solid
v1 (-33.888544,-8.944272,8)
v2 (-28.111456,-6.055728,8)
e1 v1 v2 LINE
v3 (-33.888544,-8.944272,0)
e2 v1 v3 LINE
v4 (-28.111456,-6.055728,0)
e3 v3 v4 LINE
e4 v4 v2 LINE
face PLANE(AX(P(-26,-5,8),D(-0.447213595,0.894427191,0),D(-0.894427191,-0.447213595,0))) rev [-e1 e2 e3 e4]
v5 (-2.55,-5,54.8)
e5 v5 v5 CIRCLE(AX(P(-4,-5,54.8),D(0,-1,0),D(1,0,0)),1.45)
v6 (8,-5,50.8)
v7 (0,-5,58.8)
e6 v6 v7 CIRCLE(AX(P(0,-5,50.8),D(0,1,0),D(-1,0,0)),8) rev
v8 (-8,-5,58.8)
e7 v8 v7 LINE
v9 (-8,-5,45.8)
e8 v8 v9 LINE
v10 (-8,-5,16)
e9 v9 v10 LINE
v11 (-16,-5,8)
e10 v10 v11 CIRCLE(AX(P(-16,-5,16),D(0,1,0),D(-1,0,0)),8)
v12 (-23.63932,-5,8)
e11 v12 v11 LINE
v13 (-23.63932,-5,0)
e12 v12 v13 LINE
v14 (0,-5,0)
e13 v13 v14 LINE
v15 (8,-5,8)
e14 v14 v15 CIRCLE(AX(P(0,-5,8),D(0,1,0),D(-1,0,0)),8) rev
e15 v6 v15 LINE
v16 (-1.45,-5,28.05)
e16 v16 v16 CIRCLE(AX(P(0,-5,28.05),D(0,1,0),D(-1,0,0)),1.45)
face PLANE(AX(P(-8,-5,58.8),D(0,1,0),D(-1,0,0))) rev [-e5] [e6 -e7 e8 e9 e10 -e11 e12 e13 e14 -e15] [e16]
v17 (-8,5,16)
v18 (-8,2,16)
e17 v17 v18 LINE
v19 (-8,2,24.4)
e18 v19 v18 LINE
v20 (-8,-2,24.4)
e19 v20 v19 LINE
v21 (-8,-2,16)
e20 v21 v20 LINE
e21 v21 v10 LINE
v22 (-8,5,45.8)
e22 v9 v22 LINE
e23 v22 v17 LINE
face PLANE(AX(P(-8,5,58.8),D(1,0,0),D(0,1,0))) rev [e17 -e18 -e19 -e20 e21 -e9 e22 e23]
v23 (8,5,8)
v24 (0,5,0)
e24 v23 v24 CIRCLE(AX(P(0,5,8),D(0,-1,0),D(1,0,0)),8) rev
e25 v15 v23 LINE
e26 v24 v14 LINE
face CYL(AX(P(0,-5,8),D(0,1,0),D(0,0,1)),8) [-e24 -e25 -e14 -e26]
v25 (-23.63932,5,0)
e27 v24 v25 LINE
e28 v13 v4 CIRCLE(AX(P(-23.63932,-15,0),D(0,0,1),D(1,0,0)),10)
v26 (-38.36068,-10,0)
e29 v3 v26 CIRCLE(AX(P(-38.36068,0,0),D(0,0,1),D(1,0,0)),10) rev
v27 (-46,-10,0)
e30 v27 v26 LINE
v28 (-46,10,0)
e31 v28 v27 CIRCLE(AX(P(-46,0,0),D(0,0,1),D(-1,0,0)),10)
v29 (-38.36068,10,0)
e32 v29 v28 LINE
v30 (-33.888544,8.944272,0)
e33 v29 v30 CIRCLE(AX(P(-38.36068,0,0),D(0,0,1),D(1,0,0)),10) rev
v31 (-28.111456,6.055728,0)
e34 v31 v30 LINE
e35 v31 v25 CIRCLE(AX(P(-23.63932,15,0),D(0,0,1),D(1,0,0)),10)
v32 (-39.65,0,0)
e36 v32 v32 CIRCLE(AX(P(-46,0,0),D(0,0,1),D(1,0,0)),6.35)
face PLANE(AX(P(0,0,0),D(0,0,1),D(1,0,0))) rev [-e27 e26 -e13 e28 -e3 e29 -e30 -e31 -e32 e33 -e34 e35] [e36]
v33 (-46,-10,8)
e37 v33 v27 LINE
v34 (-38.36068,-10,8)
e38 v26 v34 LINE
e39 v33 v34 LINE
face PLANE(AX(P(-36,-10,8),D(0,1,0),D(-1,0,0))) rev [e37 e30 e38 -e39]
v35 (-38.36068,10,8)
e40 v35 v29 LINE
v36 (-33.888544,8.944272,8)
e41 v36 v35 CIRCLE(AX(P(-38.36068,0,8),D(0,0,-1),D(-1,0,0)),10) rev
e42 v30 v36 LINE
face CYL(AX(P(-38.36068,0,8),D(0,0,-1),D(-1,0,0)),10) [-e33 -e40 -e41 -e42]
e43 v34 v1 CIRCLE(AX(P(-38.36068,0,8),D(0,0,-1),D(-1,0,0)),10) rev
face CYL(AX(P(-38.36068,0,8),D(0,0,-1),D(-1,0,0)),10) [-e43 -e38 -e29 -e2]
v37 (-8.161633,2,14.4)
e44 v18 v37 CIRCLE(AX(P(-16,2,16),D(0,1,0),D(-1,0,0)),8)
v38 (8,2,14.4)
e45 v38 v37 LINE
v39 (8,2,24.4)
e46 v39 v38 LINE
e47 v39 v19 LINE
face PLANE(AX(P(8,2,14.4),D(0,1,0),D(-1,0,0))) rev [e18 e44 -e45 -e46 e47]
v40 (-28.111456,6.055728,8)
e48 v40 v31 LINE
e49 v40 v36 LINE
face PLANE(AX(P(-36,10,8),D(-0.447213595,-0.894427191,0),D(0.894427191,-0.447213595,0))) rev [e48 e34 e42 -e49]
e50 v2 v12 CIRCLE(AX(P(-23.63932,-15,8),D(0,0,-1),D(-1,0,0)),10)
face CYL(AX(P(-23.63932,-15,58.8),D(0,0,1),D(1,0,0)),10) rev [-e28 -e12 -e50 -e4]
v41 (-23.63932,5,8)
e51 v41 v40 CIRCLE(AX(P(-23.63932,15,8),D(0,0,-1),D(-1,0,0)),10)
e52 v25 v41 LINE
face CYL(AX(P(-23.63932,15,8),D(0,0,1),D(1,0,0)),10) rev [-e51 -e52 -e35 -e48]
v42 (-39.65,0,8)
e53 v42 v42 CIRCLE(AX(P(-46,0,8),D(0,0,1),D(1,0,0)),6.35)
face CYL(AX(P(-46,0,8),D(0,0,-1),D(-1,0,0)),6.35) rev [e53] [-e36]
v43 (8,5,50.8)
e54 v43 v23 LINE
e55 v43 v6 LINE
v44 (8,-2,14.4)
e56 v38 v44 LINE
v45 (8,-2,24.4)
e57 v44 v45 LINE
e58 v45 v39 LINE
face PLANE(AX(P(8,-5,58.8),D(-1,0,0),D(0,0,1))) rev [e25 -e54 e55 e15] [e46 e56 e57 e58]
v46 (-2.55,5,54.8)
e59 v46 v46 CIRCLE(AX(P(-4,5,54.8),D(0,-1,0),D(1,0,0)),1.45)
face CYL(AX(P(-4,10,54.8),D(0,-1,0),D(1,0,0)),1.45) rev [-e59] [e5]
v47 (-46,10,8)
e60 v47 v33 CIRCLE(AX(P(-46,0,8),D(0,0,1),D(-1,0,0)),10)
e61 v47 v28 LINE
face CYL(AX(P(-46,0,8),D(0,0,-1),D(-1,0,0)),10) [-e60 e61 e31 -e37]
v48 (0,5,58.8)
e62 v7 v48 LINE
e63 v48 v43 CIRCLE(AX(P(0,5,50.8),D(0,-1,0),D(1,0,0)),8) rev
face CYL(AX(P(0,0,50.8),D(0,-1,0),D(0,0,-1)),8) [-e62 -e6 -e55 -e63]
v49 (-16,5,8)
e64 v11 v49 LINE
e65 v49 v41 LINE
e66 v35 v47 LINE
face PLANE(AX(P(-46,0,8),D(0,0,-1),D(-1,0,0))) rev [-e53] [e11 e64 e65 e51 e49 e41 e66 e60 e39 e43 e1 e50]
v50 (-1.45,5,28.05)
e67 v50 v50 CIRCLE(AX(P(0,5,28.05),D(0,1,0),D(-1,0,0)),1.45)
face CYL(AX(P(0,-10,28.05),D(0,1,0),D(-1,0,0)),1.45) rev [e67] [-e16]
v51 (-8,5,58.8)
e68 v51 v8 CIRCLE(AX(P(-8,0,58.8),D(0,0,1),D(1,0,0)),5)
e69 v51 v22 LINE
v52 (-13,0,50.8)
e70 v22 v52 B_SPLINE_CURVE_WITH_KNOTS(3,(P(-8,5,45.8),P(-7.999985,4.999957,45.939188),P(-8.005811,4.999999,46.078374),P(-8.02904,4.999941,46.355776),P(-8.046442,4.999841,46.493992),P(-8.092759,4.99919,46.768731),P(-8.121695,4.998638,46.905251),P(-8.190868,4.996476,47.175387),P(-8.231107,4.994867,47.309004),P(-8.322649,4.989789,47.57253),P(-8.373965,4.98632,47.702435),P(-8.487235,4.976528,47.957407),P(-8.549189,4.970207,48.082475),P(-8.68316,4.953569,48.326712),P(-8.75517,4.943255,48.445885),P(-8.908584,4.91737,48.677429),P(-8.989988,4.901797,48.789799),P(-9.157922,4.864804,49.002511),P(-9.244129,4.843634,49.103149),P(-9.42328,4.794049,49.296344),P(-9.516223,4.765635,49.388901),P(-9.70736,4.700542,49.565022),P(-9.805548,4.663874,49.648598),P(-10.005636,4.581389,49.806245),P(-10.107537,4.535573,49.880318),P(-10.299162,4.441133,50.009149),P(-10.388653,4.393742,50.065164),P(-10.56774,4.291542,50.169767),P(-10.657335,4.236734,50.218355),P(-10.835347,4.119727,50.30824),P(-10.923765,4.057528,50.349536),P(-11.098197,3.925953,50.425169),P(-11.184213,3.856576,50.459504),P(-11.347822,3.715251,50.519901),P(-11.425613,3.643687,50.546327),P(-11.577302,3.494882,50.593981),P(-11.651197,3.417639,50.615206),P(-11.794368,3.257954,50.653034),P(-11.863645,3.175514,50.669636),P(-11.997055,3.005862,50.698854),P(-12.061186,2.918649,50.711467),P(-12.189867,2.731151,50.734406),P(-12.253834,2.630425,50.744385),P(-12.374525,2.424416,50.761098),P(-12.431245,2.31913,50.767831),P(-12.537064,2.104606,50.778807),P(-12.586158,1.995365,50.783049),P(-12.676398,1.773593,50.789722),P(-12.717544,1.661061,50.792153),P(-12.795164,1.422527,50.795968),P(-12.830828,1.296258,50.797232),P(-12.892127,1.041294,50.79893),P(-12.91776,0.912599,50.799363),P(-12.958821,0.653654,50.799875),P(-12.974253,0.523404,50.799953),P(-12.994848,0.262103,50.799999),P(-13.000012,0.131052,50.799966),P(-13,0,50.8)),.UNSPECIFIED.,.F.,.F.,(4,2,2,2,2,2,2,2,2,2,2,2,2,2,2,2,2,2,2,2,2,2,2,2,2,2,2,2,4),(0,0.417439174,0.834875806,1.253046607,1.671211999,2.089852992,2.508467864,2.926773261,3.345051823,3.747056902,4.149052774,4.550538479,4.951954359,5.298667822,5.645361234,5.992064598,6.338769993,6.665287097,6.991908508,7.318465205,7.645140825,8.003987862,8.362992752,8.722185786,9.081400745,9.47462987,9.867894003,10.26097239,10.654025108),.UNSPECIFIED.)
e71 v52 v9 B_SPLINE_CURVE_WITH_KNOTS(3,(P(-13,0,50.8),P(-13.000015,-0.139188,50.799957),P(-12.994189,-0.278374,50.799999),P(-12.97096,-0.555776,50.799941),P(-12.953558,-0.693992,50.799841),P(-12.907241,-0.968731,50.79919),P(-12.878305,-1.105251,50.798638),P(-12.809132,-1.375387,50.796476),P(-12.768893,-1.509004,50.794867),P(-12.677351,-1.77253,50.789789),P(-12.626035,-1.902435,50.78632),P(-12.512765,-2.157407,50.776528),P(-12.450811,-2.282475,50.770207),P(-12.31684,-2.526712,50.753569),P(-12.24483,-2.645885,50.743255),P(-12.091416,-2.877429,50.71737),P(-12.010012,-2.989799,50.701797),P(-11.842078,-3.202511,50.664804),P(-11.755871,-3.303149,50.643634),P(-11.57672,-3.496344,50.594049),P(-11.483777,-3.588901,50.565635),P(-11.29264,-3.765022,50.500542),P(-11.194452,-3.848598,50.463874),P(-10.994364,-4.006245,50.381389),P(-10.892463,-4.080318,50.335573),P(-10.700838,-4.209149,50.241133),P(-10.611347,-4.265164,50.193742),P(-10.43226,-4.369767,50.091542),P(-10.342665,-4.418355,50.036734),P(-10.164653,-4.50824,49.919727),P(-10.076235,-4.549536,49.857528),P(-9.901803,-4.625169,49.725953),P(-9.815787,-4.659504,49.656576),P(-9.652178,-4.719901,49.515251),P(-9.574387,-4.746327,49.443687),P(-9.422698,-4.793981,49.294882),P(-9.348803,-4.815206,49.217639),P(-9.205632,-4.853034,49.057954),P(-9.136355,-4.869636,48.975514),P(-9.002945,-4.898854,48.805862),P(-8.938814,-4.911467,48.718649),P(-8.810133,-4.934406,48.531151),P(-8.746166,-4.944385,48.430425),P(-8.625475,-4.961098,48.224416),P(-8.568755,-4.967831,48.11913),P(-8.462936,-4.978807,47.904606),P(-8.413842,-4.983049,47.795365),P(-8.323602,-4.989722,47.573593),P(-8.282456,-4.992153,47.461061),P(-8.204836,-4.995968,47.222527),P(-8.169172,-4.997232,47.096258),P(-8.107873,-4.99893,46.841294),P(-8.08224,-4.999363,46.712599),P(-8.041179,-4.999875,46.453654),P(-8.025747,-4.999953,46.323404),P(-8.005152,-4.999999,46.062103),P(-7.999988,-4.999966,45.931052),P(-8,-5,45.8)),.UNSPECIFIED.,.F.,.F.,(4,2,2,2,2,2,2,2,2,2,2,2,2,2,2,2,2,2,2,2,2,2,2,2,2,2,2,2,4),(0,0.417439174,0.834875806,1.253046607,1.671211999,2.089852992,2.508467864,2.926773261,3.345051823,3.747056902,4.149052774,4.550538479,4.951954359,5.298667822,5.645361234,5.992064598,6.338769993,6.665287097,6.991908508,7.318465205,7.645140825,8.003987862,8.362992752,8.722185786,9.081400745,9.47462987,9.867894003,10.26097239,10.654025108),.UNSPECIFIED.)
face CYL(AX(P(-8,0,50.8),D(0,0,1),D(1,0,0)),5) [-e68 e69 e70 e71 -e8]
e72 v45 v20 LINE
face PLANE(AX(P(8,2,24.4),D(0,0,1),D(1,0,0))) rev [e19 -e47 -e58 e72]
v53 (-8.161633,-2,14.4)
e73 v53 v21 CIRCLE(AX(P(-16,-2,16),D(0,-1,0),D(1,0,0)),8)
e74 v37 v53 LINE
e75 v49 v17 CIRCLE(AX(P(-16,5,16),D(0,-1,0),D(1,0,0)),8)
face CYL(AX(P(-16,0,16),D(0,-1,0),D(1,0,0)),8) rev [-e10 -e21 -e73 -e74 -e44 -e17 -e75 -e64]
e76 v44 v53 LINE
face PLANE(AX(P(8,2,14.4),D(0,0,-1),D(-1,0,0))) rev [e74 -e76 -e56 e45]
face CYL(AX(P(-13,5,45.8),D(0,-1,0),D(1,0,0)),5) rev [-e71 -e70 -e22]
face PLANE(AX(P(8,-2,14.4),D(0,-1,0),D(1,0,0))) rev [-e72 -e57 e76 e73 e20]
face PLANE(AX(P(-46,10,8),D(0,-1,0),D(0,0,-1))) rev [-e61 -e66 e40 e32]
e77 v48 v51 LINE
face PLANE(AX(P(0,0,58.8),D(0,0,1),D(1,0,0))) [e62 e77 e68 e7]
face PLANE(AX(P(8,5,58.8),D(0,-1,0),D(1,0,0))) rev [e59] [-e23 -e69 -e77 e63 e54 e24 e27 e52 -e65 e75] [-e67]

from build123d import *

# Parameters (mm, degrees)
SKETCH1_W           = 16
SKETCH1_H           = 10
BOSS_EXTRUDE1_DEPTH = 58.8
BOSS_EXTRUDE2_DEPTH = 8
SKETCH4_R           = 6.35
BOSS_EXTRUDE4_DEPTH = 8
SKETCH7_R           = 1.45
CUT_EXTRUDE1_DEPTH  = 83.573845738
SKETCH13_R          = 1.45
CUT_EXTRUDE5_DEPTH  = 83.573845738
SKETCH14_W          = 10
SKETCH14_H          = 4
CUT_EXTRUDE6_DEPTH  = 77.560041797
FILLET1_R           = 8
FILLET4_R           = 10
FILLET5_R           = 5
FILLET6_R           = 8


with BuildPart() as part:
    # Sketch1 → Boss-Extrude1 (new body)
    with BuildSketch(Plane.XY):
        Rectangle(SKETCH1_W, SKETCH1_H)
    extrude(amount=BOSS_EXTRUDE1_DEPTH)

    # Sketch2 → Boss-Extrude2 (add)
    with BuildSketch(Plane.XY.offset(58.8)):
        with BuildLine():
            Line((-8, 5), (-8, -5))
            ThreePointArc((-8, -5), (-13, 0), (-8, 5))
        make_face()
    extrude(amount=-BOSS_EXTRUDE2_DEPTH)

    # Sketch4 → Boss-Extrude4 (add)
    with BuildSketch(Plane.XY):
        with BuildLine():
            Line((-8, 5), (-8, -5))
            Line((-8, -5), (-26, -5))
            Line((-26, -5), (-36, -10))
            Line((-36, -10), (-46, -10))
            ThreePointArc((-46, -10), (-56, 0), (-46, 10))
            Line((-46, 10), (-36, 10))
            Line((-36, 10), (-26, 5))
            Line((-26, 5), (-8, 5))
        make_face()
        with Locations((-46, 0)):
            Circle(SKETCH4_R, mode=Mode.SUBTRACT)
    extrude(amount=BOSS_EXTRUDE4_DEPTH)

    # Sketch7 → Cut-Extrude1 (cut, through all)
    with BuildSketch(Plane.XZ.offset(5)):
        with Locations((-4, 54.8)):
            Circle(SKETCH7_R)
    extrude(amount=-CUT_EXTRUDE1_DEPTH, mode=Mode.SUBTRACT)

    # Sketch13 → Cut-Extrude5 (cut, through all)
    with BuildSketch(Plane(origin=(0, 5, 0), x_dir=(1, 0, 0), z_dir=(0, 1, 0))):
        with Locations(Location((0, -28.05, 0), (0, 0, 180))):
            Circle(SKETCH13_R)
    extrude(amount=-CUT_EXTRUDE5_DEPTH, mode=Mode.SUBTRACT)

    # Sketch14 → Cut-Extrude6 (cut, through all)
    with BuildSketch(Plane.ZY.offset(8)):
        with Locations((19.4, 0)):
            Rectangle(SKETCH14_W, SKETCH14_H)
    extrude(amount=-CUT_EXTRUDE6_DEPTH, mode=Mode.SUBTRACT)

    # Fillet1
    fillet1_edges = [part.edges().sort_by_distance(p)[0] for p in [
        (8, 0, 58.8),
        (8, 0, 0),
    ]]
    fillet(fillet1_edges, radius=FILLET1_R)

    # Fillet4
    fillet4_edges = [part.edges().sort_by_distance(p)[0] for p in [
        (-26, 5, 4),
        (-36, 10, 4),
        (-36, -10, 4),
        (-26, -5, 4),
    ]]
    fillet(fillet4_edges, radius=FILLET4_R)

    # Fillet5
    # the kernel refuses this fillet: 5 mm, written as the material it adds along each edge
    with BuildSketch(Plane(origin=(-8, 17.5, 50.8), x_dir=(0, 0, -1), z_dir=(0, -1, 0))) as fillet5_piece_1_section:
        with BuildLine():
            CenterArc((FILLET5_R, -FILLET5_R), FILLET5_R, 90, 90)
            Line((0, -FILLET5_R), (0, 0))
            Line((0, 0), (FILLET5_R, 0))
        make_face()
    fillet5_piece_1 = extrude(amount=35, mode=Mode.PRIVATE)
    fillet5_piece_1 = fillet5_piece_1 & Plane(origin=(-8, 0, 49.649047906), x_dir=(0, -1, 0), z_dir=(0, 0, 1)) * Cylinder(5, 90, mode=Mode.PRIVATE)
    add(fillet5_piece_1)

    # Fillet6
    # the kernel refuses this fillet: 8 mm, written as the material it adds along each edge
    with BuildSketch(Plane(origin=(-8, 5, 8), x_dir=(-1, 0, 0), z_dir=(0, -1, 0))) as fillet6_piece_1_section:
        with BuildLine():
            CenterArc((FILLET6_R, -FILLET6_R), FILLET6_R, 90, 90)
            Line((0, -FILLET6_R), (0, 0))
            Line((0, 0), (FILLET6_R, 0))
        make_face()
    fillet6_piece_1 = extrude(amount=10, mode=Mode.PRIVATE)
    fillet6_piece_1 = split(fillet6_piece_1, bisect_by=Plane(origin=(-9.850932113, 2, 9.698021043), z_dir=(0, 1, 0)), keep=Keep.TOP, mode=Mode.PRIVATE)
    fillet6_piece_1 = split(fillet6_piece_1, bisect_by=Plane(origin=(-9.850932113, 3.5, 14.4), z_dir=(0, 0, -1)), keep=Keep.TOP, mode=Mode.PRIVATE)
    add(fillet6_piece_1)
    with BuildSketch(Plane(origin=(-8, 5, 8), x_dir=(-1, 0, 0), z_dir=(0, -1, 0))) as fillet6_piece_2_section:
        with BuildLine():
            CenterArc((FILLET6_R, -FILLET6_R), FILLET6_R, 90, 90)
            Line((0, -FILLET6_R), (0, 0))
            Line((0, 0), (FILLET6_R, 0))
        make_face()
    fillet6_piece_2 = extrude(amount=10, mode=Mode.PRIVATE)
    fillet6_piece_2 = split(fillet6_piece_2, bisect_by=Plane(origin=(-7.952247513, 2, 15.099340059), z_dir=(0, 1, 0)), keep=Keep.TOP, mode=Mode.PRIVATE)
    fillet6_piece_2 = split(fillet6_piece_2, bisect_by=Plane(origin=(-7.952247513, 3.5, 14.4), z_dir=(0, 0, 1)), keep=Keep.TOP, mode=Mode.PRIVATE)
    add(fillet6_piece_2)
    with BuildSketch(Plane(origin=(-8, 5, 8), x_dir=(-1, 0, 0), z_dir=(0, -1, 0))) as fillet6_piece_3_section:
        with BuildLine():
            CenterArc((FILLET6_R, -FILLET6_R), FILLET6_R, 90, 90)
            Line((0, -FILLET6_R), (0, 0))
            Line((0, 0), (FILLET6_R, 0))
        make_face()
    fillet6_piece_3 = extrude(amount=10, mode=Mode.PRIVATE)
    fillet6_piece_3 = split(fillet6_piece_3, bisect_by=Plane(origin=(-9.850932113, 2, 9.698021043), z_dir=(0, -1, 0)), keep=Keep.TOP, mode=Mode.PRIVATE)
    fillet6_piece_3 = split(fillet6_piece_3, bisect_by=Plane(origin=(-9.850932113, -2, 9.698021043), z_dir=(0, 1, 0)), keep=Keep.TOP, mode=Mode.PRIVATE)
    fillet6_piece_3 = split(fillet6_piece_3, bisect_by=Plane(origin=(-9.850932113, 0, 14.4), z_dir=(0, 0, -1)), keep=Keep.TOP, mode=Mode.PRIVATE)
    add(fillet6_piece_3)
    with BuildSketch(Plane(origin=(-8, 5, 8), x_dir=(-1, 0, 0), z_dir=(0, -1, 0))) as fillet6_piece_4_section:
        with BuildLine():
            CenterArc((FILLET6_R, -FILLET6_R), FILLET6_R, 90, 90)
            Line((0, -FILLET6_R), (0, 0))
            Line((0, 0), (FILLET6_R, 0))
        make_face()
    fillet6_piece_4 = extrude(amount=10, mode=Mode.PRIVATE)
    fillet6_piece_4 = split(fillet6_piece_4, bisect_by=Plane(origin=(-9.850932113, -2, 9.698021043), z_dir=(0, -1, 0)), keep=Keep.TOP, mode=Mode.PRIVATE)
    fillet6_piece_4 = split(fillet6_piece_4, bisect_by=Plane(origin=(-9.850932113, -3.5, 14.4), z_dir=(0, 0, -1)), keep=Keep.TOP, mode=Mode.PRIVATE)
    add(fillet6_piece_4)
    with BuildSketch(Plane(origin=(-8, 5, 8), x_dir=(-1, 0, 0), z_dir=(0, -1, 0))) as fillet6_piece_5_section:
        with BuildLine():
            CenterArc((FILLET6_R, -FILLET6_R), FILLET6_R, 90, 90)
            Line((0, -FILLET6_R), (0, 0))
            Line((0, 0), (FILLET6_R, 0))
        make_face()
    fillet6_piece_5 = extrude(amount=10, mode=Mode.PRIVATE)
    fillet6_piece_5 = split(fillet6_piece_5, bisect_by=Plane(origin=(-7.952247513, -2, 15.099340059), z_dir=(0, -1, 0)), keep=Keep.TOP, mode=Mode.PRIVATE)
    fillet6_piece_5 = split(fillet6_piece_5, bisect_by=Plane(origin=(-7.952247513, -3.5, 14.4), z_dir=(0, 0, 1)), keep=Keep.TOP, mode=Mode.PRIVATE)
    add(fillet6_piece_5)


solid = part.part
